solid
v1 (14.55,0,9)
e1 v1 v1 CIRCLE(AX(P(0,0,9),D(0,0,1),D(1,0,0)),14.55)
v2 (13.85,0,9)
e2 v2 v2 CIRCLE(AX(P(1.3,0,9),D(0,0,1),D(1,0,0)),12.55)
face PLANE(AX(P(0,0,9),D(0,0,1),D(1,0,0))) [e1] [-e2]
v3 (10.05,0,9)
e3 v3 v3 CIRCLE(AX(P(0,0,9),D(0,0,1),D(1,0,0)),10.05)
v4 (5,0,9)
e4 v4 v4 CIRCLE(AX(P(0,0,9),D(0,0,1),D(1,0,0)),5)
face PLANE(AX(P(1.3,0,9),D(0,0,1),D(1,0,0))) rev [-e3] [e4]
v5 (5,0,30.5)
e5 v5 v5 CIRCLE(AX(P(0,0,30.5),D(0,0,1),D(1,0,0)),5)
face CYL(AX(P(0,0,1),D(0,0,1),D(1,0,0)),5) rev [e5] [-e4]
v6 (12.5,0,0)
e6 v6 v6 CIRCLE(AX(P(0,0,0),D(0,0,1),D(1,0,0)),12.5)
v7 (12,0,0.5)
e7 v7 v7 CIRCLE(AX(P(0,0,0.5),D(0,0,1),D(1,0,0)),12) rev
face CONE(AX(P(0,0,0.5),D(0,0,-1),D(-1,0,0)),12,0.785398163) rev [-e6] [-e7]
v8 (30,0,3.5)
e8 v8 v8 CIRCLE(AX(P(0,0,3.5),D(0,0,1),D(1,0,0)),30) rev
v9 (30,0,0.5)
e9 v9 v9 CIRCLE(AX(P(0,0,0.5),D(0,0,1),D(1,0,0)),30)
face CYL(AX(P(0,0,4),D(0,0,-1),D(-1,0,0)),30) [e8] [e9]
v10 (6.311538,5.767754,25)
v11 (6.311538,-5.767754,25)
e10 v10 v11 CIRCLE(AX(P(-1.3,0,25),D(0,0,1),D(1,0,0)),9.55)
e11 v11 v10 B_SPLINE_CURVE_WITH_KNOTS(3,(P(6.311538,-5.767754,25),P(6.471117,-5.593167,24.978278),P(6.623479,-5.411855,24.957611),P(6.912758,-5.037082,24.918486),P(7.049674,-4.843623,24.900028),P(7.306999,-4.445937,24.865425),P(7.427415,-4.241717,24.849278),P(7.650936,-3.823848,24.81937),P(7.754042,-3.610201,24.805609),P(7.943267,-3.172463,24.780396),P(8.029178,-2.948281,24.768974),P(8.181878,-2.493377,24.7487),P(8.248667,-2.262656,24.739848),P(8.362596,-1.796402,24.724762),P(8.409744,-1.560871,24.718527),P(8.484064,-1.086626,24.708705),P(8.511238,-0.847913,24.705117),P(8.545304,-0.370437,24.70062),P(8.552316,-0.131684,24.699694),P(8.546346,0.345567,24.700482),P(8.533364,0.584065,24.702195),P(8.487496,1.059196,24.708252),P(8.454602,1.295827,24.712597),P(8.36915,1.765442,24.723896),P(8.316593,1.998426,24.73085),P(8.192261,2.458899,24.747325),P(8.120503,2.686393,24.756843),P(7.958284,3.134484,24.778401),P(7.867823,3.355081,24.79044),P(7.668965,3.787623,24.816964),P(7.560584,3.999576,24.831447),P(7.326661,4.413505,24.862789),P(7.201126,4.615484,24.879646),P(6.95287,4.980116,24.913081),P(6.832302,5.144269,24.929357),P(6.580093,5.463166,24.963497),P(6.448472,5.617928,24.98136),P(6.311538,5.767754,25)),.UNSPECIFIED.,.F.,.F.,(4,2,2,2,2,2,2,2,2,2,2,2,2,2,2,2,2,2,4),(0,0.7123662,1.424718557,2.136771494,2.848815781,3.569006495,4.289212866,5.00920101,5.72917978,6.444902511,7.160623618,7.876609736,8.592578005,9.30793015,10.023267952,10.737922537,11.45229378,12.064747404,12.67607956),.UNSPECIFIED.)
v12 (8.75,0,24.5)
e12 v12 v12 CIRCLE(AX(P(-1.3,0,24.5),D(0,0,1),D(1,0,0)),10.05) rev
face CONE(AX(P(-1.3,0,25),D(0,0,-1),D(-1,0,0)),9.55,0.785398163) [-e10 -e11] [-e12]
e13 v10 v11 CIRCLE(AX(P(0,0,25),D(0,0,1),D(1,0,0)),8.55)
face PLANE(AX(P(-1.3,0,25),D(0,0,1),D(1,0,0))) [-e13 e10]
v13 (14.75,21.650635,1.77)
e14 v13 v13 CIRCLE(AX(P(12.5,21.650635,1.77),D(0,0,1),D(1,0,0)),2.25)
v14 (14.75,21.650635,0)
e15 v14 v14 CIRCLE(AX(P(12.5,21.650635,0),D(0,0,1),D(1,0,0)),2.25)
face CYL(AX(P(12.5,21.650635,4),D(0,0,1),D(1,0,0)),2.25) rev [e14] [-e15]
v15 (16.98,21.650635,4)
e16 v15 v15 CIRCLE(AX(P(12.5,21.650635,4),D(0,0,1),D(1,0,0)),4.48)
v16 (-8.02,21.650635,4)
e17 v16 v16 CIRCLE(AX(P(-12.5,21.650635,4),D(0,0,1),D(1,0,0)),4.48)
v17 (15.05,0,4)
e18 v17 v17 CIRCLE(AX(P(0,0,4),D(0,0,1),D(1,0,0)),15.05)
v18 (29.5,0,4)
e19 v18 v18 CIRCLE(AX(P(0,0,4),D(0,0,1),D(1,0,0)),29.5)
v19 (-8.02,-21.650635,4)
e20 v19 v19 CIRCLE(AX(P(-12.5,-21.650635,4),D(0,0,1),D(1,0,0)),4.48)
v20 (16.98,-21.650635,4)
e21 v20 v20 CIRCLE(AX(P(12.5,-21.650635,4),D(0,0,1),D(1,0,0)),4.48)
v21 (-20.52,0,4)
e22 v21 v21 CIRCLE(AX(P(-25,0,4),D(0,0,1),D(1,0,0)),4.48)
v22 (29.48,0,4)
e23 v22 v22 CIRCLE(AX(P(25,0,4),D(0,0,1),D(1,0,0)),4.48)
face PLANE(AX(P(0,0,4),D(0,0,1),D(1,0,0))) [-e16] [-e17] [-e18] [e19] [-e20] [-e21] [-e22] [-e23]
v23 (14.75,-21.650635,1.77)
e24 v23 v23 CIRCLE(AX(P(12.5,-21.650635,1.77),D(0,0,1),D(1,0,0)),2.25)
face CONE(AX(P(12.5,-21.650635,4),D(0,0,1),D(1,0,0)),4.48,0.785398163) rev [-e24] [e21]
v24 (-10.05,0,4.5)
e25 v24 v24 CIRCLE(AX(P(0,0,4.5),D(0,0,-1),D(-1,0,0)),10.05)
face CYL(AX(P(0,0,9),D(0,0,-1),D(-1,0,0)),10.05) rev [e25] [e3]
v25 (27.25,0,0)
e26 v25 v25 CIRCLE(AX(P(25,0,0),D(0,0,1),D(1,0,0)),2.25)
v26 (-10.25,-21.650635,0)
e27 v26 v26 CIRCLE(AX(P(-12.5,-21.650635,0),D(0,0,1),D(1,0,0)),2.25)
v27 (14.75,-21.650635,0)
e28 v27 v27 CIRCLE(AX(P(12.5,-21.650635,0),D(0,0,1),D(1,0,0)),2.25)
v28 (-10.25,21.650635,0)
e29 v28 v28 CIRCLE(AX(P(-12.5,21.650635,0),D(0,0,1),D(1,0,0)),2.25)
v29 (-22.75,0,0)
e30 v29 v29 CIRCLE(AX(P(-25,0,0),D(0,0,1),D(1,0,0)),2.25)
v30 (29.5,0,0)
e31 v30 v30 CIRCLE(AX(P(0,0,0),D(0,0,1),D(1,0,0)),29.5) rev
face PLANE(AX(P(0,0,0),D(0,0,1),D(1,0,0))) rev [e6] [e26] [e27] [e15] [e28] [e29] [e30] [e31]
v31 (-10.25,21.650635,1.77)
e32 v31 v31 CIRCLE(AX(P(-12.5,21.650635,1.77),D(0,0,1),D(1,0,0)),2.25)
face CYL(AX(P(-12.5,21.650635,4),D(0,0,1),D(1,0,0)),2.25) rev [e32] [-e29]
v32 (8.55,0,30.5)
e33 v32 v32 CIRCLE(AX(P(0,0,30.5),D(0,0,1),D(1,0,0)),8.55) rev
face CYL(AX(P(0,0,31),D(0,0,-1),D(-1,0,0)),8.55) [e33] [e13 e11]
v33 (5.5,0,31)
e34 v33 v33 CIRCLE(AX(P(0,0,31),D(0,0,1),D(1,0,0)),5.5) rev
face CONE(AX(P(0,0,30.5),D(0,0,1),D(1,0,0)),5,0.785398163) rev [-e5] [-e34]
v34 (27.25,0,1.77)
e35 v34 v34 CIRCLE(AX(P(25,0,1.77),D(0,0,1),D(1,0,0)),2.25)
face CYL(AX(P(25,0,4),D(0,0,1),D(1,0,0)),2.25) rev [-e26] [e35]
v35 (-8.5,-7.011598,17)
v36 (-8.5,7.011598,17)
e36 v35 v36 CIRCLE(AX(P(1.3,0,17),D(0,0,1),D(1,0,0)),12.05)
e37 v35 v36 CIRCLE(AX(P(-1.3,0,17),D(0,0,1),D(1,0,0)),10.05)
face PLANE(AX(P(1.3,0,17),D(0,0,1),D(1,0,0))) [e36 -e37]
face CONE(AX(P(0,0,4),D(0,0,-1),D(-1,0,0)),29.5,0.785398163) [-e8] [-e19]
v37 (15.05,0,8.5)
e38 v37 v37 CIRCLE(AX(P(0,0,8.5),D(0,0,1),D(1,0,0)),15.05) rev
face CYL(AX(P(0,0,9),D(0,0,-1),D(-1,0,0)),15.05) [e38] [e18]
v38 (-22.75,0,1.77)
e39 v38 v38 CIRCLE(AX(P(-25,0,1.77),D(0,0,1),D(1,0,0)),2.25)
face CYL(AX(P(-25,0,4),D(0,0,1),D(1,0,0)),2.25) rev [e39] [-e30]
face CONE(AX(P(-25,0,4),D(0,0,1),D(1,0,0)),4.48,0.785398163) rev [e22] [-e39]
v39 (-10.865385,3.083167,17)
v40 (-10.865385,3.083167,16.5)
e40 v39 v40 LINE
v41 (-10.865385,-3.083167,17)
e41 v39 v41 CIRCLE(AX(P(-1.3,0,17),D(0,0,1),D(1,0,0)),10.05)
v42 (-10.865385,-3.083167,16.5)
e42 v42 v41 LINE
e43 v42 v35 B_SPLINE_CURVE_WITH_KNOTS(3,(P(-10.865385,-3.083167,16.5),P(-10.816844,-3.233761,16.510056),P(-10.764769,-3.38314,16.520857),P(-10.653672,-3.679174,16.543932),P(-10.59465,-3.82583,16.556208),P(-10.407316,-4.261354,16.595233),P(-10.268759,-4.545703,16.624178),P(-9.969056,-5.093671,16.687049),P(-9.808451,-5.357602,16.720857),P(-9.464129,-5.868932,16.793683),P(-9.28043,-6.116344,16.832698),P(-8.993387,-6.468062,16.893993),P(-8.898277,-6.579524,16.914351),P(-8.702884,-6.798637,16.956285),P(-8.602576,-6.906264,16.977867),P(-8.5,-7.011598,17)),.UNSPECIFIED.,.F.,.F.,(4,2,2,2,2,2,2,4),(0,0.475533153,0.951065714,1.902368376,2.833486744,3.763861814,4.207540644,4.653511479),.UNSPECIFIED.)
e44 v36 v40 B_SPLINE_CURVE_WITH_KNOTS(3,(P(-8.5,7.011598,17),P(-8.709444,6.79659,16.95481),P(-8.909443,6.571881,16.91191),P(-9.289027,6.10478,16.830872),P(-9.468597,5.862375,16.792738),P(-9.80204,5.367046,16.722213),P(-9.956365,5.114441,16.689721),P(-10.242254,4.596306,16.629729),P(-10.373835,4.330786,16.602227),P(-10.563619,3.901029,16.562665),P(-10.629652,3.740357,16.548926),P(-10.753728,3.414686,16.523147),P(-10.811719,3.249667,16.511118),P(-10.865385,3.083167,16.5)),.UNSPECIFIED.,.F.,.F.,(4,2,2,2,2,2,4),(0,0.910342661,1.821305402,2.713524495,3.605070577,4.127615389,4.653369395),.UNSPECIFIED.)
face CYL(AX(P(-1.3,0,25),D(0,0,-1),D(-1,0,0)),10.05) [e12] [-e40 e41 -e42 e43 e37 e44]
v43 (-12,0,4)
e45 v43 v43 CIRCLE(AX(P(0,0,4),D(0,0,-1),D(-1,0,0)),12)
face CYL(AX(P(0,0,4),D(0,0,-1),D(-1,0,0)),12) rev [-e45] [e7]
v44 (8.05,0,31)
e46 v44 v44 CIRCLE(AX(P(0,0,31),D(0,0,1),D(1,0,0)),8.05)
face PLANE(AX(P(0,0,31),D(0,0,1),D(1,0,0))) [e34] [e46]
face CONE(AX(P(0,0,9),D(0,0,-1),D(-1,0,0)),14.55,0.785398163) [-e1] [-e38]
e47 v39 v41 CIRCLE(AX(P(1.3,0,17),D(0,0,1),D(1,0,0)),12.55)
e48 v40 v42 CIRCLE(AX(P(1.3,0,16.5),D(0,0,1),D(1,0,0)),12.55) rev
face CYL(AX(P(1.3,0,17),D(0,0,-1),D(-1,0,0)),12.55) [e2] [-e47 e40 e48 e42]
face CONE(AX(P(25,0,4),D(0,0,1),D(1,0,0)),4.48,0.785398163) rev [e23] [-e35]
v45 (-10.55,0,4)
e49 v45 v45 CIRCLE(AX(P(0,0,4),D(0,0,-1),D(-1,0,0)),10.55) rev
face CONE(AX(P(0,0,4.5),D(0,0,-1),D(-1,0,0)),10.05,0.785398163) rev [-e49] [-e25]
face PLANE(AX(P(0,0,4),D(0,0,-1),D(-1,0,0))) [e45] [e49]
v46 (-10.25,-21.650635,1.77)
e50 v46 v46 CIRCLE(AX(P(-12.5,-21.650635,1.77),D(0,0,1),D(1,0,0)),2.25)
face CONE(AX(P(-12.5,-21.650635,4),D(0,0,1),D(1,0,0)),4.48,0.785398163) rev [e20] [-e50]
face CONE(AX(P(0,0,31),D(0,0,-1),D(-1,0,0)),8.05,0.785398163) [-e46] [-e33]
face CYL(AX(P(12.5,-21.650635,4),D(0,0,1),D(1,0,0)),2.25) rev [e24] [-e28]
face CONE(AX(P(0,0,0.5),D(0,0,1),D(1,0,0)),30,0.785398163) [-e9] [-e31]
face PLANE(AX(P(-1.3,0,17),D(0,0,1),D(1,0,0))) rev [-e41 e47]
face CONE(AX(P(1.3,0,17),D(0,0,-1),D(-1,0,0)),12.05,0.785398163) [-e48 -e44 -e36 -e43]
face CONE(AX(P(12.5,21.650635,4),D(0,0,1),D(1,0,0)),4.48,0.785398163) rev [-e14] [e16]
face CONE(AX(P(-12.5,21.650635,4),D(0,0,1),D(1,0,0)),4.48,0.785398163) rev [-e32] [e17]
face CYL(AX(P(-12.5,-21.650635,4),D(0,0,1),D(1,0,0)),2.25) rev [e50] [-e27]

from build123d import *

# Parameters (mm, degrees)
SKETCH1_R                                    = 30
BOSS_EXTRUDE1_DEPTH                          = 4
CSK_FOR_M4_HEX_SOCKET_COUNTERSUNK_CA_2_COUNT = 2
CSK_FOR_M4_HEX_SOCKET_COUNTERSUNK_CA_2_PITCH = 25
CSK_FOR_M4_HEX_SOCKET_COUNTERSUNK_CA_3_COUNT = 2
CSK_FOR_M4_HEX_SOCKET_COUNTERSUNK_CA_3_PITCH = 43.301270189
CSK_FOR_M4_HEX_SOCKET_COUNTERSUNK_CA_4_COUNT = 2
CSK_FOR_M4_HEX_SOCKET_COUNTERSUNK_CA_4_PITCH = 43.301270189
CSK_FOR_M4_HEX_SOCKET_COUNTERSUNK_CA_5_COUNT = 2
CSK_FOR_M4_HEX_SOCKET_COUNTERSUNK_CA_5_PITCH = 50
CSK_FOR_M4_HEX_SOCKET_COUNTERSUNK_CA_6_COUNT = 2
CSK_FOR_M4_HEX_SOCKET_COUNTERSUNK_CA_6_PITCH = 25
SKETCH2_R                                    = 15.05
SKETCH2_R_2                                  = 10.05
BOSS_EXTRUDE3_DEPTH                          = 5
SKETCH5_R                                    = 12
CUT_EXTRUDE2_DEPTH                           = 4
SKETCH6_R                                    = 12.55
BOSS_EXTRUDE4_DEPTH                          = 8
SKETCH7_R                                    = 10.05
BOSS_EXTRUDE5_DEPTH                          = 8
SKETCH8_R                                    = 8.55
BOSS_EXTRUDE6_DEPTH                          = 6
SKETCH9_R                                    = 5
CUT_EXTRUDE3_DEPTH                           = 30
CHAMFER1_SIZE                                = 0.5


with BuildPart() as part:
    # Sketch1 → Boss-Extrude1 (new body)
    with BuildSketch(Plane.XY):
        Circle(SKETCH1_R)
    extrude(amount=BOSS_EXTRUDE1_DEPTH)

    # Sketch3 → CSK for M4 Hex Socket Countersunk Cap Screw1 (revolve, cut)
    with BuildSketch(Plane(origin=(-12.5, 21.650635095, 4), x_dir=(0, -1, 0), z_dir=(1, 0, 0))):
        Polygon((0, 0), (0, 4), (2.25, 4), (2.25, 2.23), (4.48, 0), align=None)
    csk_for_m4_hex_socket_countersunk_cap_sc = revolve(axis=Axis((-12.5, 21.650635095, 10.35), (0, 0, -1)), mode=Mode.SUBTRACT)

    # CSK for M4 Hex Socket Countersunk Ca 2: CSK for M4 Hex Socket Countersunk Cap Screw1 ×2
    with Locations(*[(i * CSK_FOR_M4_HEX_SOCKET_COUNTERSUNK_CA_2_PITCH, 0, 0) for i in range(1, CSK_FOR_M4_HEX_SOCKET_COUNTERSUNK_CA_2_COUNT)]):
        add(csk_for_m4_hex_socket_countersunk_cap_sc, mode=Mode.SUBTRACT)

    # CSK for M4 Hex Socket Countersunk Ca 3: CSK for M4 Hex Socket Countersunk Cap Screw1 ×2
    with Locations(*[Vector(0.8660254037844606, -0.4999999999999621, 0) * (i * CSK_FOR_M4_HEX_SOCKET_COUNTERSUNK_CA_3_PITCH) for i in range(1, CSK_FOR_M4_HEX_SOCKET_COUNTERSUNK_CA_3_COUNT)]):
        add(csk_for_m4_hex_socket_countersunk_cap_sc, mode=Mode.SUBTRACT)

    # CSK for M4 Hex Socket Countersunk Ca 4: CSK for M4 Hex Socket Countersunk Cap Screw1 ×2
    with Locations(*[(0, -i * CSK_FOR_M4_HEX_SOCKET_COUNTERSUNK_CA_4_PITCH, 0) for i in range(1, CSK_FOR_M4_HEX_SOCKET_COUNTERSUNK_CA_4_COUNT)]):
        add(csk_for_m4_hex_socket_countersunk_cap_sc, mode=Mode.SUBTRACT)

    # CSK for M4 Hex Socket Countersunk Ca 5: CSK for M4 Hex Socket Countersunk Cap Screw1 ×2
    with Locations(*[Vector(0.5000000000000379, -0.8660254037844168, 0) * (i * CSK_FOR_M4_HEX_SOCKET_COUNTERSUNK_CA_5_PITCH) for i in range(1, CSK_FOR_M4_HEX_SOCKET_COUNTERSUNK_CA_5_COUNT)]):
        add(csk_for_m4_hex_socket_countersunk_cap_sc, mode=Mode.SUBTRACT)

    # CSK for M4 Hex Socket Countersunk Ca 6: CSK for M4 Hex Socket Countersunk Cap Screw1 ×2
    with Locations(*[Vector(-0.49999999999996236, -0.8660254037844605, 0) * (i * CSK_FOR_M4_HEX_SOCKET_COUNTERSUNK_CA_6_PITCH) for i in range(1, CSK_FOR_M4_HEX_SOCKET_COUNTERSUNK_CA_6_COUNT)]):
        add(csk_for_m4_hex_socket_countersunk_cap_sc, mode=Mode.SUBTRACT)

    # Sketch2 → Boss-Extrude3 (add)
    with BuildSketch(Plane.XY.offset(4)):
        Circle(SKETCH2_R)
        Circle(SKETCH2_R_2, mode=Mode.SUBTRACT)
    extrude(amount=BOSS_EXTRUDE3_DEPTH)

    # Sketch5 → Cut-Extrude2 (cut)
    with BuildSketch(Plane(origin=(0, 0, 0), x_dir=(-1, 0, 0), z_dir=(0, 0, -1))):
        Circle(SKETCH5_R)
    extrude(amount=-CUT_EXTRUDE2_DEPTH, mode=Mode.SUBTRACT)

    # Sketch6 → Boss-Extrude4 (add)
    with BuildSketch(Plane.XY.offset(9)):
        with Locations((1.3, 0)):
            Circle(SKETCH6_R)
    extrude(amount=BOSS_EXTRUDE4_DEPTH)

    # Sketch7 → Boss-Extrude5 (add)
    with BuildSketch(Plane.XY.offset(17)):
        with Locations(Location((-1.3, 0, 0), (0, 0, 162.13454876))):
            Circle(SKETCH7_R)
    extrude(amount=BOSS_EXTRUDE5_DEPTH)

    # Sketch8 → Boss-Extrude6 (add)
    with BuildSketch(Plane.XY.offset(25)):
        Circle(SKETCH8_R)
    extrude(amount=BOSS_EXTRUDE6_DEPTH)

    # Sketch9 → Cut-Extrude3 (cut)
    with BuildSketch(Plane.XY.offset(31)):
        Circle(SKETCH9_R)
    extrude(amount=-CUT_EXTRUDE3_DEPTH, mode=Mode.SUBTRACT)

    # Chamfer1
    # the kernel refuses this chamfer: 0.5 mm, written as the material it takes off along each edge
    with BuildSketch(Plane(origin=(0, 0, 0), x_dir=(1, 0, 0), z_dir=(0, -1, 0))) as chamfer1_piece_1:
        Polygon((30, CHAMFER1_SIZE), (30 - CHAMFER1_SIZE, 0), (30, 0), align=None)
    revolve(axis=Axis((0, 0, 0), (0, 0, 1)), mode=Mode.SUBTRACT)
    with BuildSketch(Plane(origin=(0, 0, 9), x_dir=(1, 0, 0), z_dir=(0, -1, 0))) as chamfer1_piece_2:
        Polygon((15.05, -CHAMFER1_SIZE), (15.05 - CHAMFER1_SIZE, 0), (15.05, 0), align=None)
    revolve(axis=Axis((0, 0, 9), (0, 0, 1)), mode=Mode.SUBTRACT)
    with BuildSketch(Plane(origin=(0, 0, 4), x_dir=(1, 0, 0), z_dir=(0, -1, 0))) as chamfer1_piece_3:
        Polygon((30, -CHAMFER1_SIZE), (30 - CHAMFER1_SIZE, 0), (30, 0), align=None)
    revolve(axis=Axis((0, 0, 4), (0, 0, 1)), mode=Mode.SUBTRACT)
    with BuildSketch(Plane(origin=(0, 0, 4), x_dir=(1, 0, 0), z_dir=(0, -1, 0))) as chamfer1_piece_4:
        Polygon((10.05 + CHAMFER1_SIZE, 0), (10.05, CHAMFER1_SIZE), (10.05, 0), align=None)
    revolve(axis=Axis((0, 0, 4), (0, 0, 1)), mode=Mode.SUBTRACT)
    with BuildSketch(Plane(origin=(0, 0, 0), x_dir=(-1, 0, 0), z_dir=(0, -1, 0))) as chamfer1_piece_5:
        Polygon((12 + CHAMFER1_SIZE, 0), (12, -CHAMFER1_SIZE), (12, 0), align=None)
    revolve(axis=Axis((0, 0, 0), (0, 0, -1)), mode=Mode.SUBTRACT)
    with BuildSketch(Plane(origin=(1.3, 0, 17), x_dir=(-0.9894169628260336, -0.1451002194075096, 0), z_dir=(-0.1451002194075096, 0.9894169628260336, 0))) as chamfer1_piece_6_section:
        Polygon((12.55, -CHAMFER1_SIZE), (12.55 - CHAMFER1_SIZE, 0), (12.55, 0), align=None)
    chamfer1_piece_6 = revolve(axis=Axis((1.3, 0, 17), (0, 0, 1)), revolution_arc=171.656917286, mode=Mode.PRIVATE)
    chamfer1_piece_6 = chamfer1_piece_6 - Plane(origin=(-1.3, 0, 16.761451234), x_dir=(-0.9517795637185023, 0.3067827604149514, 0), z_dir=(0, 0, -1)) * Cylinder(10.05, 51, mode=Mode.PRIVATE)
    add(chamfer1_piece_6, mode=Mode.SUBTRACT)
    with BuildSketch(Plane(origin=(-1.3, 0, 25), x_dir=(-0.9517795637185023, 0.3067827604149514, 0), z_dir=(0.3067827604149514, 0.9517795637185023, 0))) as chamfer1_piece_7_section:
        Polygon((10.05, -CHAMFER1_SIZE), (10.05 - CHAMFER1_SIZE, 0), (10.05, 0), align=None)
    chamfer1_piece_7 = revolve(axis=Axis((-1.3, 0, 25), (0, 0, 1)), mode=Mode.PRIVATE)
    chamfer1_piece_7 = chamfer1_piece_7 - Plane(origin=(0, 0, 24.76381896), x_dir=(1, 0, 0), z_dir=(0, 0, -1)) * Cylinder(8.55, 41, mode=Mode.PRIVATE)
    add(chamfer1_piece_7, mode=Mode.SUBTRACT)
    with BuildSketch(Plane(origin=(0, 0, 31), x_dir=(1, 0, 0), z_dir=(0, -1, 0))) as chamfer1_piece_8:
        Polygon((8.55 - CHAMFER1_SIZE, 0), (8.55, -CHAMFER1_SIZE), (8.55, 0), align=None)
    revolve(axis=Axis((0, 0, 31), (0, 0, 1)), mode=Mode.SUBTRACT)
    with BuildSketch(Plane(origin=(0, 0, 31), x_dir=(1, 0, 0), z_dir=(0, -1, 0))) as chamfer1_piece_9:
        Polygon((5, -CHAMFER1_SIZE), (5 + CHAMFER1_SIZE, 0), (5, 0), align=None)
    revolve(axis=Axis((0, 0, 31), (0, 0, 1)), mode=Mode.SUBTRACT)
    with BuildSketch(Plane(origin=(1.3, 0, 17), x_dir=(1, 0, 0), z_dir=(0, -1, 0))) as chamfer1_piece_10_section:
        Polygon((12.55, -CHAMFER1_SIZE), (12.55 - CHAMFER1_SIZE, 0), (12.55, 0), align=None)
    chamfer1_piece_10 = revolve(axis=Axis((1.3, 0, 17), (0, 0, 1)), revolution_arc=171.656917286, mode=Mode.PRIVATE)
    chamfer1_piece_10 = chamfer1_piece_10 - Plane(origin=(-1.3, 0, 16.761451234), x_dir=(-0.9517795637185023, 0.3067827604149514, 0), z_dir=(0, 0, -1)) * Cylinder(10.05, 51, mode=Mode.PRIVATE)
    add(chamfer1_piece_10, mode=Mode.SUBTRACT)


solid = part.part
